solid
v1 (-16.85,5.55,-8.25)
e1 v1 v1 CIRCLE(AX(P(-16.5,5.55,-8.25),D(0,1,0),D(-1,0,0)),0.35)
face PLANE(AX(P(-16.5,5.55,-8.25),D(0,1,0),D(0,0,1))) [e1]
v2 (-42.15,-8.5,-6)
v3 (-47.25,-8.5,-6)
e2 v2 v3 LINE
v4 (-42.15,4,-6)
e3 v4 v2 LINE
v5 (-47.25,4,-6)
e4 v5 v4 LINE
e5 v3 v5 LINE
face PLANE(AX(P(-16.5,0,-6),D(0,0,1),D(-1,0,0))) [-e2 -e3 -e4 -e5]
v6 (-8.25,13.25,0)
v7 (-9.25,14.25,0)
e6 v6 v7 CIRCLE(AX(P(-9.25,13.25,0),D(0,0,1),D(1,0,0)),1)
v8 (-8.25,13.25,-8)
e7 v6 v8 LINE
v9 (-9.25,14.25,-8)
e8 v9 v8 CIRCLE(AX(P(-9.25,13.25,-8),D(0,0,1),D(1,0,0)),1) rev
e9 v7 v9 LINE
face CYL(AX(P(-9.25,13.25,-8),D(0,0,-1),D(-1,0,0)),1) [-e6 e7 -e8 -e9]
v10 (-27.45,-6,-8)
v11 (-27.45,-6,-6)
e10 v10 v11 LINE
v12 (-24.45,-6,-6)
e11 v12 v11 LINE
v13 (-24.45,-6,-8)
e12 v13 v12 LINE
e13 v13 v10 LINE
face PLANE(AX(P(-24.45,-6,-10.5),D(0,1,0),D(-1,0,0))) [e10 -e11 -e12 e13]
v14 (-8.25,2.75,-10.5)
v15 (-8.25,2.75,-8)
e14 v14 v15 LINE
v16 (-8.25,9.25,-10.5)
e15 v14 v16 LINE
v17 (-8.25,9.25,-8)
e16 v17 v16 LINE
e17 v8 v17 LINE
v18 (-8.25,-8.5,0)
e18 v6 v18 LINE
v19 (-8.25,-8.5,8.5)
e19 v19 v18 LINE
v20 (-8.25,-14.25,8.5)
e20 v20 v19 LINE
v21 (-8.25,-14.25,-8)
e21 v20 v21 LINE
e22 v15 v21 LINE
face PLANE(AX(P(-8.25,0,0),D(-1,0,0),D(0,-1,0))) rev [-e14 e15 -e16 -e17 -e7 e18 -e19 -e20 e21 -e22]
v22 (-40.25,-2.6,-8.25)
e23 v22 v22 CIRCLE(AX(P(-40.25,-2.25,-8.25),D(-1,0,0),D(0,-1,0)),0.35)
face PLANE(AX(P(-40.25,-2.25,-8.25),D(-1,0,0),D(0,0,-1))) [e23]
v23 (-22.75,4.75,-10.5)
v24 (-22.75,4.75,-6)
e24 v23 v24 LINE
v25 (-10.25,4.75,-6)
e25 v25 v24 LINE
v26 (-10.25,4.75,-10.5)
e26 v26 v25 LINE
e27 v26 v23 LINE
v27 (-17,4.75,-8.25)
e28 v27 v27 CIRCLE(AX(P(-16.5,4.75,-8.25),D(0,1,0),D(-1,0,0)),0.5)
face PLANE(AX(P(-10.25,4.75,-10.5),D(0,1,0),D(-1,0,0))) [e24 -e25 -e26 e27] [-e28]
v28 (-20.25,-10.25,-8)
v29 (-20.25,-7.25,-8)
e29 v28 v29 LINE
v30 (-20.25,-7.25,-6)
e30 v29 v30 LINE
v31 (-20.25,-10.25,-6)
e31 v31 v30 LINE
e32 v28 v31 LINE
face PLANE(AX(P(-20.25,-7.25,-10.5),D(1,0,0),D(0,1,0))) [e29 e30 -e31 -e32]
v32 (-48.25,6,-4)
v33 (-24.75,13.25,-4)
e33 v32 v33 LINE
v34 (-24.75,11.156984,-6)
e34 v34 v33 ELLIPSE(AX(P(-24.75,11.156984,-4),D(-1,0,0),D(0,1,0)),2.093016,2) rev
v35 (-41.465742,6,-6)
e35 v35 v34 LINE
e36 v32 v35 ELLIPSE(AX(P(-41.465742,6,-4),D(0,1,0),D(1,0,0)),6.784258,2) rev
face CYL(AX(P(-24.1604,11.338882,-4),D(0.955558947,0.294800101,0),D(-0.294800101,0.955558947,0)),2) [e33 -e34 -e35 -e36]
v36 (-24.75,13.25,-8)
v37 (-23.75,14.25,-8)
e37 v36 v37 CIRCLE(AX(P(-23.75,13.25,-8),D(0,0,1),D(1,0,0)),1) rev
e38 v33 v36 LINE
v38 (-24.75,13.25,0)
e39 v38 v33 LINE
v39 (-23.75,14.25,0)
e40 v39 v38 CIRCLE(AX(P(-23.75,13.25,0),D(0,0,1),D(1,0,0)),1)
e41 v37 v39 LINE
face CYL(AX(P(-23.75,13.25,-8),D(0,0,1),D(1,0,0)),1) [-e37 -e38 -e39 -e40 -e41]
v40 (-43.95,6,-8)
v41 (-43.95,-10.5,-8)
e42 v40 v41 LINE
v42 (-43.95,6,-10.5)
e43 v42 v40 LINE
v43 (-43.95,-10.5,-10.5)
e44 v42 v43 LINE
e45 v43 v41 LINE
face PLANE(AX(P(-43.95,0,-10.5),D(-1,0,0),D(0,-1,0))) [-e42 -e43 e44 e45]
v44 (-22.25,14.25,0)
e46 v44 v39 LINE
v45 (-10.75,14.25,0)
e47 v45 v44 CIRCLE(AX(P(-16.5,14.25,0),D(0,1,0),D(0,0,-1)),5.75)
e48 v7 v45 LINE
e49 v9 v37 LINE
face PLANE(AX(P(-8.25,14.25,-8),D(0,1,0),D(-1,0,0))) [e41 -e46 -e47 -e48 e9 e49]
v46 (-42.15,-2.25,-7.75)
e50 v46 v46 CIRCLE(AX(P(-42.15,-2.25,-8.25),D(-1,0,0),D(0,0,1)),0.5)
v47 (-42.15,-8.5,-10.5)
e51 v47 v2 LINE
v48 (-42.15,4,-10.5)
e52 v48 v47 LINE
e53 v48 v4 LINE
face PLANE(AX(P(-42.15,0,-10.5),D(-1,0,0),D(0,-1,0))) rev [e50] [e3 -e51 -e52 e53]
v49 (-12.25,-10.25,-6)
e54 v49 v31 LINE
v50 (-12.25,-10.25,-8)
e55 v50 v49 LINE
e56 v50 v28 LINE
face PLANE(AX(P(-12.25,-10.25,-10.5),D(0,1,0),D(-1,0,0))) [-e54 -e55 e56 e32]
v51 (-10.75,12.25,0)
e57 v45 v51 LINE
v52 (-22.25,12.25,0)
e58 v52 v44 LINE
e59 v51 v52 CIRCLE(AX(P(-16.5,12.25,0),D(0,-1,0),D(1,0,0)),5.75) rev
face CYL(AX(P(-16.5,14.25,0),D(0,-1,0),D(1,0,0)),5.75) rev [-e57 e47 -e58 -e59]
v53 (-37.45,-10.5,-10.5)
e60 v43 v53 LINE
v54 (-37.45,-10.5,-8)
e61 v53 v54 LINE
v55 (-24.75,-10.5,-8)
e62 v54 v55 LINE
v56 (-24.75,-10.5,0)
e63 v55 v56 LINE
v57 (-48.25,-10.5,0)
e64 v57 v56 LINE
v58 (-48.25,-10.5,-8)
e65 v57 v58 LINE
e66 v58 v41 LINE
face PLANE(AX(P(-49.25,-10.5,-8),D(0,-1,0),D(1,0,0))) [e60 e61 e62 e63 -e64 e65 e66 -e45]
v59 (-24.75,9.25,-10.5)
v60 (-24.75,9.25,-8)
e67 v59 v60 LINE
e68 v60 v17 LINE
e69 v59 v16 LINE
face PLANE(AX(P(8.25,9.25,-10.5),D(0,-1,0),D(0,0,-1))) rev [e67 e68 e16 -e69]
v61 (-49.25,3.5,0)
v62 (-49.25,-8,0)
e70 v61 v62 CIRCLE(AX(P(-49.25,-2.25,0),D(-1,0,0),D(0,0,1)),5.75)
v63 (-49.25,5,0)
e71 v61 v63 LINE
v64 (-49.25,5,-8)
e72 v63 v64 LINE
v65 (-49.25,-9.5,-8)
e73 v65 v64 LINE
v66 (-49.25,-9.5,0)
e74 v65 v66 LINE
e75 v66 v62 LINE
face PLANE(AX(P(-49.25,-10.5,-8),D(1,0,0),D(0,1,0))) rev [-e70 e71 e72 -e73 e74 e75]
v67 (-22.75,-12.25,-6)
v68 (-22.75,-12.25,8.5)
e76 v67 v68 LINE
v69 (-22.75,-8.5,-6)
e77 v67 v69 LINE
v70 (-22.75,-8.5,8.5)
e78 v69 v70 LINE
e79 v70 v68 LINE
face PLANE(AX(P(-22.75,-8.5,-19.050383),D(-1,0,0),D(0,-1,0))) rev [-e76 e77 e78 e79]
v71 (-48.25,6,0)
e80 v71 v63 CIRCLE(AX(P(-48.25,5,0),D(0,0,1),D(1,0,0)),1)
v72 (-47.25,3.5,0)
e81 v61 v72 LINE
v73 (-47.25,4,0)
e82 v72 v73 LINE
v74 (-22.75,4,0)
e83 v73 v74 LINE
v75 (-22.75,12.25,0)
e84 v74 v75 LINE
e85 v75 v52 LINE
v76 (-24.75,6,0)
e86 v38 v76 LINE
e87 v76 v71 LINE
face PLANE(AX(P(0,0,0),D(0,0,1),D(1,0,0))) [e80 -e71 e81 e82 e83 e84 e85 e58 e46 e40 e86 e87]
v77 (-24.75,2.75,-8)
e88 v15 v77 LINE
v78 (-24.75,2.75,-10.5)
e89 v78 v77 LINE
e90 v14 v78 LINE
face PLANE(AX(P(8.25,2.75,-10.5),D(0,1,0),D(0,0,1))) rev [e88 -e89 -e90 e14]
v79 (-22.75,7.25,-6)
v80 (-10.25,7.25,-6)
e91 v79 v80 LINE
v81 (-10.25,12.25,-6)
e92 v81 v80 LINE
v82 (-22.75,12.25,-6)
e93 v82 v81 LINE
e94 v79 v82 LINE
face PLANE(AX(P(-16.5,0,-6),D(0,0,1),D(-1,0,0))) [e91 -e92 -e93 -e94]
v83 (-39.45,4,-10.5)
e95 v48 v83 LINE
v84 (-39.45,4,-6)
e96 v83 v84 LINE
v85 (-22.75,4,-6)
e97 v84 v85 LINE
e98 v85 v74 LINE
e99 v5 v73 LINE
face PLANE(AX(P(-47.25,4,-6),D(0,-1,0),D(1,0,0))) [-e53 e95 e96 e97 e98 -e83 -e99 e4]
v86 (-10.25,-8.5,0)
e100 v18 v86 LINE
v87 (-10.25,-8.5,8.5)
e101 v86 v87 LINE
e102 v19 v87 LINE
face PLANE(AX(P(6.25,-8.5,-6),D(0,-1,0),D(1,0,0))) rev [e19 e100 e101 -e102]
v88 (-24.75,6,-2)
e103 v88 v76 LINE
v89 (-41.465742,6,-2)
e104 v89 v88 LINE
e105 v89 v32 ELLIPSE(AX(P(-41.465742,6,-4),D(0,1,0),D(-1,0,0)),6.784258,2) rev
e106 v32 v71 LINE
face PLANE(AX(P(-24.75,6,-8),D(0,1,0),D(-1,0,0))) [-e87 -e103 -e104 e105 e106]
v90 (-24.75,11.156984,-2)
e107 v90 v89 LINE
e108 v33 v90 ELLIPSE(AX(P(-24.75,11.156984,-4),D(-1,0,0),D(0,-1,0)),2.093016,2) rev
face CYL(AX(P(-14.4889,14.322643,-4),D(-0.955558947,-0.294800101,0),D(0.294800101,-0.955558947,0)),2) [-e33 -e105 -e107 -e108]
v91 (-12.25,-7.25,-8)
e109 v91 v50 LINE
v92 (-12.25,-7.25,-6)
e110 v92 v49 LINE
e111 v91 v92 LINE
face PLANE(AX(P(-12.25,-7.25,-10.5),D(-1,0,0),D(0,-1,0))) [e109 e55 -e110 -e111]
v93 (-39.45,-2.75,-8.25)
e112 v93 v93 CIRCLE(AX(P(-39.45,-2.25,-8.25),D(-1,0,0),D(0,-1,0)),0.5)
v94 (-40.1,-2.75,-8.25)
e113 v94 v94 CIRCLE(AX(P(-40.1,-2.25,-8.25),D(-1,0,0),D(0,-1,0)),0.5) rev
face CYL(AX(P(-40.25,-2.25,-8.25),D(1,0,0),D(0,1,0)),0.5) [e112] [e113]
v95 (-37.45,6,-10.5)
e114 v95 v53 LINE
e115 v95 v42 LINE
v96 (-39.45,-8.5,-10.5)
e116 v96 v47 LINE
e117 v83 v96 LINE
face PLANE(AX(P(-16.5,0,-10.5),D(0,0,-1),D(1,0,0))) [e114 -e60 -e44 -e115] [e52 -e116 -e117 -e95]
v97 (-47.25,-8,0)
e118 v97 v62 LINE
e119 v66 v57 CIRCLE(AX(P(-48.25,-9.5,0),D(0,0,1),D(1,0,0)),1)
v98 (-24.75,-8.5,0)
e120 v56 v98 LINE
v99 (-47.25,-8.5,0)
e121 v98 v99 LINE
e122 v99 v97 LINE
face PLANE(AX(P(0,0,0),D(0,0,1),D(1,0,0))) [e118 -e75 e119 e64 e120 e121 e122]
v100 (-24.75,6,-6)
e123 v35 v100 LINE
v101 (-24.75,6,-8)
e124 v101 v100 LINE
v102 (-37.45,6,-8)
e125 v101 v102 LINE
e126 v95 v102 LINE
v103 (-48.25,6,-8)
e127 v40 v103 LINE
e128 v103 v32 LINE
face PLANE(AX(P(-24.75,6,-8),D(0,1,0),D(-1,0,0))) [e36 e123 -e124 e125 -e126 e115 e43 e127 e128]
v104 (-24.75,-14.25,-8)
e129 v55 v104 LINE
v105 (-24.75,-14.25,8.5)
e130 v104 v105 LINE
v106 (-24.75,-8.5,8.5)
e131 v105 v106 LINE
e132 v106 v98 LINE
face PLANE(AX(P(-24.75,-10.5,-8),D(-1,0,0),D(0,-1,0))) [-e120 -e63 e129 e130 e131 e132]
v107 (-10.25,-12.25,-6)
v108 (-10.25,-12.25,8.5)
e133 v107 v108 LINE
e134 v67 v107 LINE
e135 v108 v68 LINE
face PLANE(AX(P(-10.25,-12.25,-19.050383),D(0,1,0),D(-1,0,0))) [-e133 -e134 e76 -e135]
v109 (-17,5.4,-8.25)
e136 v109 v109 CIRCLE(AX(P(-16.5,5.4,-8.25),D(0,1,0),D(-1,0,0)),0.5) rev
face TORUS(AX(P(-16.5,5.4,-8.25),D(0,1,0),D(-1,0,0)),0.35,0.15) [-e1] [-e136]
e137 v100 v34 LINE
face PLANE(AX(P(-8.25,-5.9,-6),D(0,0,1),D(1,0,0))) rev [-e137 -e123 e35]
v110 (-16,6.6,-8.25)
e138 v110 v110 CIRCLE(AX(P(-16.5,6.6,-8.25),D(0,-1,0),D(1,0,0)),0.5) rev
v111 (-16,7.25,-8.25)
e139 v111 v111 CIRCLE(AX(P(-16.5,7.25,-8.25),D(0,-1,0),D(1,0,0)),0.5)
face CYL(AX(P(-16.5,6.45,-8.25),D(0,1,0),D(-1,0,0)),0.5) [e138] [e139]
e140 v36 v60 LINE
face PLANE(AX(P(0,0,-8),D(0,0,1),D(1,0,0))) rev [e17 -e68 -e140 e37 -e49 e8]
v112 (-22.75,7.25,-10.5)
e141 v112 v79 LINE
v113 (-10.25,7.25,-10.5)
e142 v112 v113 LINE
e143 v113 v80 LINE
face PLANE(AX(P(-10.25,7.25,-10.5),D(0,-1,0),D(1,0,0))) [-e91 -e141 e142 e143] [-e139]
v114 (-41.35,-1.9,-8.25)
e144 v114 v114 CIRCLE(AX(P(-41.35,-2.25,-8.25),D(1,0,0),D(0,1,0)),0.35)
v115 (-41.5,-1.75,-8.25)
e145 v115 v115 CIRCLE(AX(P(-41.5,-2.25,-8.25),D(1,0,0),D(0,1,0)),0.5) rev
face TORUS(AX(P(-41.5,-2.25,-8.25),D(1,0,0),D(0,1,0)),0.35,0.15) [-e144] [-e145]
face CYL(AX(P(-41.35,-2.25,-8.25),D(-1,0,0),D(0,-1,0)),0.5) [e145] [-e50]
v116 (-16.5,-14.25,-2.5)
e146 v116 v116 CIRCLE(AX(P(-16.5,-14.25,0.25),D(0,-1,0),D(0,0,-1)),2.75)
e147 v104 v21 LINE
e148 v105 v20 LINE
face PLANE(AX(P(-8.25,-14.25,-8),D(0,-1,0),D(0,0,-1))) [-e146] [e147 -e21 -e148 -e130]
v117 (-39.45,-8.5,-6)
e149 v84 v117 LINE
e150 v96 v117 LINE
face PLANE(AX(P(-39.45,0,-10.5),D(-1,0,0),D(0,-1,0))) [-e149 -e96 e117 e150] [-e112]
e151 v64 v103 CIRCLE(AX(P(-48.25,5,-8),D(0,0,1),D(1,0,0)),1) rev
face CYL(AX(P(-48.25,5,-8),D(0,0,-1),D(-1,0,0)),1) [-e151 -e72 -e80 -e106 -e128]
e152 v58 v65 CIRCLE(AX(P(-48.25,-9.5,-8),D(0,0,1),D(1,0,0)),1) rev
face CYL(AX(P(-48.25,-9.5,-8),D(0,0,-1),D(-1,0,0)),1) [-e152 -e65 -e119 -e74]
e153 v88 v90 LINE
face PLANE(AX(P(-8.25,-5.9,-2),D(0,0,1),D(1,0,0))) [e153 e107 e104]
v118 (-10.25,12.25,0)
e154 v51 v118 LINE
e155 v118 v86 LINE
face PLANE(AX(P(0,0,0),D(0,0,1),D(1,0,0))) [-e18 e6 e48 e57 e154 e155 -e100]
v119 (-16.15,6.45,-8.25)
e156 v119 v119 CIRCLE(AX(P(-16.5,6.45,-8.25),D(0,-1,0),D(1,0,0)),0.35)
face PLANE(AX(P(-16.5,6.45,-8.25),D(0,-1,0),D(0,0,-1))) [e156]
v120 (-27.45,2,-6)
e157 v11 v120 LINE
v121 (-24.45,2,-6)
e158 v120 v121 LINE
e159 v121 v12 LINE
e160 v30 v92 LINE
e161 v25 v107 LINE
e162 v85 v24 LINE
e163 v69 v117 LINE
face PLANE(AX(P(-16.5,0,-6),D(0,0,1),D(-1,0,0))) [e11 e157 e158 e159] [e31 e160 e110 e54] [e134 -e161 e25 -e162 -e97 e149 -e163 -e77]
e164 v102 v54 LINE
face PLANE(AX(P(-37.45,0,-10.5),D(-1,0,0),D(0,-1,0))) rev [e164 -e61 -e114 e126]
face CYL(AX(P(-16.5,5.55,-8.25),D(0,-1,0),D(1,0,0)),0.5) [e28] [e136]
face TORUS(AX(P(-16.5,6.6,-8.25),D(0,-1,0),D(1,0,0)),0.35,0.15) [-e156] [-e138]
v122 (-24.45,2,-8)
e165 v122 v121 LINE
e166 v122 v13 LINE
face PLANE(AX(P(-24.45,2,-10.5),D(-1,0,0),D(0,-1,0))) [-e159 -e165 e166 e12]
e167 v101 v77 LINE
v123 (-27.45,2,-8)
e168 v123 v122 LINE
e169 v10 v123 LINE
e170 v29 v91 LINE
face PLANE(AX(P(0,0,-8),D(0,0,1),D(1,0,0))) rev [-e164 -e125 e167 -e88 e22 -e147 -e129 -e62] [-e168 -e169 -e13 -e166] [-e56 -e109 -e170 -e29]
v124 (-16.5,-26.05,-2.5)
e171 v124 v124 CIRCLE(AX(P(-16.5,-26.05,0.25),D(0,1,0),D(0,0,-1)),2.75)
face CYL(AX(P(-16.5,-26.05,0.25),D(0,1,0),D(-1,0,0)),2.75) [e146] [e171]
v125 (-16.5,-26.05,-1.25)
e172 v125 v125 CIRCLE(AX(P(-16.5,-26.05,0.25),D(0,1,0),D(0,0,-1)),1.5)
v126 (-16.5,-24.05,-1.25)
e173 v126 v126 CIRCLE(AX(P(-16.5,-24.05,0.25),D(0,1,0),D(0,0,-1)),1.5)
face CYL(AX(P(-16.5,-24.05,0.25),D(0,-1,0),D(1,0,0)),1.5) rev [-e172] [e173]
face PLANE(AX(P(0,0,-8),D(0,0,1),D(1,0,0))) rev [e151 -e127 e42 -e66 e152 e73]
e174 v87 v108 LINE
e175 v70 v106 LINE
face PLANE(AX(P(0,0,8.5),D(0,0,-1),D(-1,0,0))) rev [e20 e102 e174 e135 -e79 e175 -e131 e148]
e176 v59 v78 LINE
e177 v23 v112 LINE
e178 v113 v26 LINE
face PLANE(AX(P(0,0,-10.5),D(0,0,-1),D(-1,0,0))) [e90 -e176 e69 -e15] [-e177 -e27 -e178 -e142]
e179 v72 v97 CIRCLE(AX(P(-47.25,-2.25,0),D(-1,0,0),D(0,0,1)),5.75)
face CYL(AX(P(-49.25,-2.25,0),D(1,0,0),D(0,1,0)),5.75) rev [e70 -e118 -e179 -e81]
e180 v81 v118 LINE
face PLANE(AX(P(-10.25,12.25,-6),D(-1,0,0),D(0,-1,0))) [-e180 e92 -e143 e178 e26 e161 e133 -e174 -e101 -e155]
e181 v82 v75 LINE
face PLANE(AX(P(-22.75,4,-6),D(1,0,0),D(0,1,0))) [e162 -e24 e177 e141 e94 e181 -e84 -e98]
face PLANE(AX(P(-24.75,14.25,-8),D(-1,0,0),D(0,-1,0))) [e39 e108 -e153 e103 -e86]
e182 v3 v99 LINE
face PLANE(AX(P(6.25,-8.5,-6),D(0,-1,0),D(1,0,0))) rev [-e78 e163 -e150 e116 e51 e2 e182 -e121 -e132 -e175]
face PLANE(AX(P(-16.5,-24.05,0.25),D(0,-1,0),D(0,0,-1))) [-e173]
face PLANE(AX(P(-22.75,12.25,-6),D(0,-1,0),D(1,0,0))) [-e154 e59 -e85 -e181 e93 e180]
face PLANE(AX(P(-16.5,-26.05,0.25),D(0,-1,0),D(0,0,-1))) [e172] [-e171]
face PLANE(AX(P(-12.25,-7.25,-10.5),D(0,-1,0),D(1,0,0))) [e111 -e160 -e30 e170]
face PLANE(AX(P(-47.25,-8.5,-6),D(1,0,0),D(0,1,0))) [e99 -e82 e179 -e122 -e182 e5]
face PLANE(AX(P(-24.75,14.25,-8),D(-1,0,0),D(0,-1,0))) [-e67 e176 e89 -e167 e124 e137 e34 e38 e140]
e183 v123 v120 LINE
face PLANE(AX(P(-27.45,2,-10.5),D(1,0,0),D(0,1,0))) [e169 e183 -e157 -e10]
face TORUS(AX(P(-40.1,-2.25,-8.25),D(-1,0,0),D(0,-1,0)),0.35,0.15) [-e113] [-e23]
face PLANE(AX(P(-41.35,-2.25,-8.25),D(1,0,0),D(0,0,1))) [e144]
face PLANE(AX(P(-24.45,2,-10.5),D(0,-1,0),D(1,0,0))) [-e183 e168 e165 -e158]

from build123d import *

# Parameters (mm, degrees)
EXTRUDE_1_DEPTH             = 8
CUT_EXTRUDE_2_DEPTH         = 6
SKETCH_3_R                  = 5.75
CUT_EXTRUDE_3_DEPTH         = 43.881377077
SKETCH_4_R                  = 5.75
CUT_EXTRUDE_4_DEPTH         = 43.285488054
SKETCH_10_W                 = 16.5
SKETCH_10_H                 = 6.5
EXTRUDE_3_DEPTH             = 2.5
EXTRUDE_4_OUTLINE_W         = 6.5
EXTRUDE_4_OUTLINE_H         = 16.5
EXTRUDE_4_DEPTH             = 2.5
SKETCH_12_W                 = 12.5
SKETCH_12_H                 = 2.5
CUT_EXTRUDE_8_DEPTH         = 37.216363705
CUT_EXTRUDE_START           = -4.5
CUT_EXTRUDE_9_OUTLINE_W     = 2.7
CUT_EXTRUDE_9_OUTLINE_H     = 12.5
CUT_EXTRUDE_9_DEPTH         = 4.5
EXTRUDE_5_REACH             = 39.227
SKETCH_15_W                 = 16.5
SKETCH_15_H                 = 5.75
EXTRUDE_5_DIRECTION_2_DEPTH = 8.5
SKETCH_16_W                 = 12.5
SKETCH_16_H                 = 3.75
CUT_EXTRUDE_11_DEPTH        = 14.5
SKETCH_17_R                 = 2.75
EXTRUDE_6_DEPTH             = 11.8
SKETCH_19_R                 = 1.5
CUT_EXTRUDE_12_DEPTH        = 2
SKETCH_20_W                 = 8
SKETCH_20_H                 = 3
CUT_EXTRUDE_13_DEPTH        = 45.287865155
SKETCH_22_W                 = 3
SKETCH_22_H                 = 8
CUT_EXTRUDE_14_DEPTH        = 45.287865155
FILLET_5_R                  = 1
FILLET_6_R                  = 1
RIB_3_REACH                 = 45.674
SKETCH_26_WALL_W            = 113.940860968
SKETCH_26_WALL_H            = 4
FILLET_12_R                 = 2
SKETCH_28_R                 = 0.5
EXTRUDE_7_DEPTH             = 0.8
FILLET_13_R                 = 0.15
EXTRUDE_START               = 0.8
SKETCH_31_R                 = 0.5
EXTRUDE_9_DEPTH             = 0.8
FILLET_14_R                 = 0.15
SKETCH_34_R                 = 0.5
EXTRUDE_10_DEPTH            = 0.8
FILLET_16_R                 = 0.15
SKETCH_35_R                 = 0.5
EXTRUDE_11_DEPTH            = 0.8
FILLET_17_R                 = 0.15
FILLET_5_OF_MIRROR_12_R     = 1
FILLET_6_OF_MIRROR_12_R     = 1
FILLET_12_OF_MIRROR_12_R    = 2
FILLET_13_OF_MIRROR_12_R    = 0.15
FILLET_14_OF_MIRROR_12_R    = 0.15
FILLET_16_OF_MIRROR_12_R    = 0.15
FILLET_17_OF_MIRROR_12_R    = 0.15
SKETCH_32_W                 = 34.689235526
SKETCH_32_H                 = 51.308413002
CUT_EXTRUDE_15_DEPTH        = 50.697610607


# Read off the part's stored shape, not the designer's step: 凸台-拉伸4, 切除-拉伸9
with BuildPart() as part:
    # 草图1 → 凸台-拉伸1 (new body)
    with BuildSketch(Plane.XY):
        Polygon((-8.25, 14.25), (8.25, 14.25), (8.25, 6), (32.75, 6), (32.75, -10.5), (8.25, -10.5), (8.25, -14.25), (-8.25, -14.25), align=None)
    extrude_1 = extrude(amount=-EXTRUDE_1_DEPTH)

    # 草图2 → 切除-拉伸2 (cut)
    with BuildSketch(Plane.XY):
        Polygon((-6.25, 12.25), (-6.25, -12.25), (6.25, -12.25), (6.25, -8.5), (30.75, -8.5), (30.75, 4), (6.25, 4), (6.25, 12.25), align=None)
    cut_extrude_2 = extrude(amount=-CUT_EXTRUDE_2_DEPTH, mode=Mode.SUBTRACT)

    # 草图3 → 切除-拉伸3 (cut, through all)
    with BuildSketch(Plane.XZ.offset(-12.25)):
        Circle(SKETCH_3_R)
    cut_extrude_3 = extrude(amount=-CUT_EXTRUDE_3_DEPTH, mode=Mode.SUBTRACT)

    # 草图4 → 切除-拉伸4 (cut, through all)
    with BuildSketch(Plane.ZY.offset(-30.75)):
        with Locations((0, -2.25)):
            Circle(SKETCH_4_R)
    cut_extrude_4 = extrude(amount=-CUT_EXTRUDE_4_DEPTH, mode=Mode.SUBTRACT)

    # 草图10 → 凸台-拉伸3 (add)
    with BuildSketch(Plane(origin=(0, 0, -8), x_dir=(-1, 0, 0), z_dir=(0, 0, -1))):
        with Locations((0, 6)):
            Rectangle(SKETCH_10_W, SKETCH_10_H)
    extrude_3 = extrude(amount=EXTRUDE_3_DEPTH)

    # 凸台-拉伸4 outline → 凸台-拉伸4 (add)
    with BuildSketch(Plane(origin=(0, 0, -8), x_dir=(-1, 0, 0), z_dir=(0, 0, -1))):
        with Locations((-24.2, -2.25)):
            Rectangle(EXTRUDE_4_OUTLINE_W, EXTRUDE_4_OUTLINE_H)
    extrude_4 = extrude(amount=EXTRUDE_4_DEPTH)

    # 草图12 → 切除-拉伸8 (cut, through all)
    with BuildSketch(Plane.XY.offset(-6)):
        with Locations((0, 6)):
            Rectangle(SKETCH_12_W, SKETCH_12_H)
    cut_extrude_8 = extrude(amount=-CUT_EXTRUDE_8_DEPTH, mode=Mode.SUBTRACT)

    # 切除-拉伸9 outline → 切除-拉伸9 (cut)
    with BuildSketch(Plane.XY.offset(-6).offset(CUT_EXTRUDE_START)):
        with Locations((24.3, -2.25)):
            Rectangle(CUT_EXTRUDE_9_OUTLINE_W, CUT_EXTRUDE_9_OUTLINE_H)
    cut_extrude_9 = extrude(amount=CUT_EXTRUDE_9_DEPTH, mode=Mode.SUBTRACT)

    # 草图15 → 凸台-拉伸5 (add, up to next)
    with BuildSketch(Plane.XY, mode=Mode.PRIVATE) as extrude_5_sk1:
        with Locations((0, -11.375)):
            Rectangle(SKETCH_15_W, SKETCH_15_H)
    extrude_5_tool1 = extrude(extrude_5_sk1.sketch, amount=-EXTRUDE_5_REACH, mode=Mode.PRIVATE) - part.part
    extrude_5 = extrude_5_tool1.solids().sort_by_distance((0, -11.375, 0))[0]
    add(extrude_5)

    # 草图15 → 凸台-拉伸5 direction 2 (add)
    with BuildSketch(Plane.XY):
        with Locations((0, -11.375)):
            Rectangle(SKETCH_15_W, SKETCH_15_H)
    extrude_5_direction_2 = extrude(amount=EXTRUDE_5_DIRECTION_2_DEPTH)

    # 草图16 → 切除-拉伸11 (cut)
    with BuildSketch(Plane.XY.offset(8.5)):
        with Locations((0, -10.375)):
            Rectangle(SKETCH_16_W, SKETCH_16_H)
    cut_extrude_11 = extrude(amount=-CUT_EXTRUDE_11_DEPTH, mode=Mode.SUBTRACT)

    # 草图17 → 凸台-拉伸6 (add)
    with BuildSketch(Plane.XZ.offset(14.25)):
        with Locations(Location((0, 0.25, 0), (0, 0, 270))):
            Circle(SKETCH_17_R)
    extrude_6 = extrude(amount=EXTRUDE_6_DEPTH)

    # 草图19 → 切除-拉伸12 (cut)
    with BuildSketch(Plane.XZ.offset(26.05)):
        with Locations(Location((0, 0.25, 0), (0, 0, 270))):
            Circle(SKETCH_19_R)
    cut_extrude_12 = extrude(amount=-CUT_EXTRUDE_12_DEPTH, mode=Mode.SUBTRACT)

    # 草图20 → 切除-拉伸13 (cut, through all)
    with BuildSketch(Plane.XY.offset(-6)):
        with Locations((-0.25, -8.75)):
            Rectangle(SKETCH_20_W, SKETCH_20_H)
    cut_extrude_13 = extrude(amount=-CUT_EXTRUDE_13_DEPTH, mode=Mode.SUBTRACT)

    # 草图22 → 切除-拉伸14 (cut, through all)
    with BuildSketch(Plane.XY.offset(-6)):
        with Locations((9.45, -2)):
            Rectangle(SKETCH_22_W, SKETCH_22_H)
    cut_extrude_14 = extrude(amount=-CUT_EXTRUDE_14_DEPTH, mode=Mode.SUBTRACT)

    # 圆角5
    fillet_5_edges = [part.edges().sort_by_distance(p)[0] for p in [
        (-8.25, 14.25, -4),
        (8.25, 14.25, -4),
    ]]
    fillet(fillet_5_edges, radius=FILLET_5_R)

    # 圆角6
    fillet_6_edges = [part.edges().sort_by_distance(p)[0] for p in [
        (32.75, 6, -4),
        (32.75, -10.5, -4),
    ]]
    fillet(fillet_6_edges, radius=FILLET_6_R)

    # 草图26 wall → 筋3 (add, up to next)
    with BuildSketch(Plane(origin=(20, 9.625, -4), x_dir=(0.955558946739, -0.29480010059, 0), z_dir=(0.29480010059, 0.955558946739, 0)), mode=Mode.PRIVATE) as rib_3_sk1:
        Rectangle(SKETCH_26_WALL_W, SKETCH_26_WALL_H)
    rib_3_tool1 = extrude(rib_3_sk1.sketch, amount=-RIB_3_REACH, mode=Mode.PRIVATE) - part.part
    rib_3 = rib_3_tool1.solids().sort_by_distance((20, 9.625, -4))[0]
    add(rib_3)

    # 圆角12
    fillet_12_edges = [part.edges().sort_by_distance(p)[0] for p in [
        (20, 9.625, -2),
        (20, 9.625, -6),
    ]]
    fillet(fillet_12_edges, radius=FILLET_12_R - 0.0001)  # a hair under: the kernel refuses the full size

    # 草图28 → 凸台-拉伸7 (add)
    with BuildSketch(Plane.XZ.offset(-7.25)):
        with Locations(Location((0, -8.25, 0), (0, 0, 90))):
            Circle(SKETCH_28_R)
    extrude_7 = extrude(amount=EXTRUDE_7_DEPTH)

    # 圆角13
    fillet_13_edges = [part.edges().sort_by_distance(p)[0] for p in [
        (0, 6.45, -8.75),
    ]]
    fillet(fillet_13_edges, radius=FILLET_13_R)

    # 草图31 → 凸台-拉伸9 (add)
    with BuildSketch(Plane(origin=(0, 4.75, 0), x_dir=(1, 0, 0), z_dir=(0, 1, 0)).offset(EXTRUDE_START)):
        with Locations(Location((0, 8.25, 0), (0, 0, 270))):
            Circle(SKETCH_31_R)
    extrude_9 = extrude(amount=-EXTRUDE_9_DEPTH)

    # 圆角14
    fillet_14_edges = [part.edges().sort_by_distance(p)[0] for p in [
        (0, 5.55, -8.75),
    ]]
    fillet(fillet_14_edges, radius=FILLET_14_R)

    # 草图34 → 凸台-拉伸10 (add)
    with BuildSketch(Plane.ZY.offset(-25.65)):
        with Locations((-8.25, -2.25)):
            Circle(SKETCH_34_R)
    extrude_10 = extrude(amount=EXTRUDE_10_DEPTH)

    # 圆角16
    fillet_16_edges = [part.edges().sort_by_distance(p)[0] for p in [
        (24.85, -2.25, -8.75),
    ]]
    fillet(fillet_16_edges, radius=FILLET_16_R)

    # 草图35 → 凸台-拉伸11 (add)
    with BuildSketch(Plane(origin=(22.95, 0, 0), x_dir=(0, 0, -1), z_dir=(1, 0, 0)).offset(EXTRUDE_START)):
        with Locations(Location((8.25, -2.25, 0), (0, 0, 180))):
            Circle(SKETCH_35_R)
    extrude_11 = extrude(amount=-EXTRUDE_11_DEPTH)

    # 圆角17
    fillet_17_edges = [part.edges().sort_by_distance(p)[0] for p in [
        (23.75, -2.25, -8.75),
    ]]
    fillet(fillet_17_edges, radius=FILLET_17_R)


with BuildPart() as mirror_12_1:
    # 镜向12: 凸台-拉伸1 across plane
    add(extrude_1.mirror(Plane.ZY.offset(8.25)))

    # Mirror 12 2: 切除-拉伸2, 切除-拉伸3, 切除-拉伸4 across plane
    add(cut_extrude_2.mirror(Plane.ZY.offset(8.25)), mode=Mode.SUBTRACT)
    add(cut_extrude_3.mirror(Plane.ZY.offset(8.25)), mode=Mode.SUBTRACT)
    add(cut_extrude_4.mirror(Plane.ZY.offset(8.25)), mode=Mode.SUBTRACT)


with BuildPart() as mirror_12_3_1:
    # Mirror 12 3: 凸台-拉伸3, 凸台-拉伸4 across plane
    add(extrude_3.mirror(Plane.ZY.offset(8.25)))
    add(extrude_4.mirror(Plane.ZY.offset(8.25)))


with BuildPart() as mirror_12_4_tool:
    # Mirror 12 4: 切除-拉伸8, 切除-拉伸9 across plane
    add(cut_extrude_8.mirror(Plane.ZY.offset(8.25)))
    add(cut_extrude_9.mirror(Plane.ZY.offset(8.25)))


with BuildPart() as mirror_12_1_1:
    add(mirror_12_1.part)

    # Mirror 12 4: cut by mirror_12_4_tool
    add(mirror_12_4_tool.part, mode=Mode.SUBTRACT)


with BuildPart() as mirror_12_3_1_1:
    add(mirror_12_3_1.part)

    # Mirror 12 4: cut by mirror_12_4_tool
    add(mirror_12_4_tool.part, mode=Mode.SUBTRACT)


with BuildPart() as mirror_12_5_1:
    # Mirror 12 5: 凸台-拉伸5, 凸台-拉伸5 direction 2 across plane
    add(extrude_5.mirror(Plane.ZY.offset(8.25)))
    add(extrude_5_direction_2.mirror(Plane.ZY.offset(8.25)))

    # Mirror 12 6: 切除-拉伸11 across plane
    add(cut_extrude_11.mirror(Plane.ZY.offset(8.25)), mode=Mode.SUBTRACT)


with BuildPart() as mirror_12_7_1:
    # Mirror 12 7: 凸台-拉伸6 across plane
    add(extrude_6.mirror(Plane.ZY.offset(8.25)))


with BuildPart() as mirror_12_8_tool:
    # Mirror 12 8: 切除-拉伸12, 切除-拉伸13, 切除-拉伸14 across plane
    add(cut_extrude_12.mirror(Plane.ZY.offset(8.25)))
    add(cut_extrude_13.mirror(Plane.ZY.offset(8.25)))
    add(cut_extrude_14.mirror(Plane.ZY.offset(8.25)))


with BuildPart() as mirror_12_1_2:
    add(mirror_12_1_1.part)

    # Mirror 12 8: cut by mirror_12_8_tool
    add(mirror_12_8_tool.part, mode=Mode.SUBTRACT)

    # 圆角5 of 镜向12
    fillet_5_of_mirror_12_edges = [mirror_12_1_2.edges().sort_by_distance(p)[0] for p in [
        (-8.25, 14.25, -4),
        (-24.75, 14.25, -4),
    ]]
    fillet(fillet_5_of_mirror_12_edges, radius=FILLET_5_OF_MIRROR_12_R)

    # 圆角6 of 镜向12
    fillet_6_of_mirror_12_edges = [mirror_12_1_2.edges().sort_by_distance(p)[0] for p in [
        (-49.25, 6, -4),
        (-49.25, -10.5, -4),
    ]]
    fillet(fillet_6_of_mirror_12_edges, radius=FILLET_6_OF_MIRROR_12_R)


with BuildPart() as mirror_12_7_1_1:
    add(mirror_12_7_1.part)

    # Mirror 12 8: cut by mirror_12_8_tool
    add(mirror_12_8_tool.part, mode=Mode.SUBTRACT)


with BuildPart() as mirror_12_9_1:
    # Mirror 12 9: 筋3, 凸台-拉伸7, 凸台-拉伸9, 凸台-拉伸10, 凸台-拉伸11 across plane
    add(rib_3.mirror(Plane.ZY.offset(8.25)))
    add(extrude_7.mirror(Plane.ZY.offset(8.25)))
    add(extrude_9.mirror(Plane.ZY.offset(8.25)))
    add(extrude_10.mirror(Plane.ZY.offset(8.25)))
    add(extrude_11.mirror(Plane.ZY.offset(8.25)))

    # 圆角12 of 镜向12
    fillet_12_of_mirror_12_edges = [mirror_12_9_1.edges().sort_by_distance(p)[0] for p in [
        (-36.5, 9.625, -2),
        (-36.5, 9.625, -6),
    ]]
    fillet(fillet_12_of_mirror_12_edges, radius=FILLET_12_OF_MIRROR_12_R - 0.0001)  # a hair under: the kernel refuses the full size

    # 圆角13 of 镜向12
    fillet_13_of_mirror_12_edges = [mirror_12_9_1.edges().sort_by_distance(p)[0] for p in [
        (-16.5, 6.45, -8.75),
    ]]
    fillet(fillet_13_of_mirror_12_edges, radius=FILLET_13_OF_MIRROR_12_R)

    # 圆角14 of 镜向12
    fillet_14_of_mirror_12_edges = [mirror_12_9_1.edges().sort_by_distance(p)[0] for p in [
        (-16.5, 5.55, -8.75),
    ]]
    fillet(fillet_14_of_mirror_12_edges, radius=FILLET_14_OF_MIRROR_12_R)

    # 圆角16 of 镜向12
    fillet_16_of_mirror_12_edges = [mirror_12_9_1.edges().sort_by_distance(p)[0] for p in [
        (-41.35, -2.25, -8.75),
    ]]
    fillet(fillet_16_of_mirror_12_edges, radius=FILLET_16_OF_MIRROR_12_R)

    # 圆角17 of 镜向12
    fillet_17_of_mirror_12_edges = [mirror_12_9_1.edges().sort_by_distance(p)[0] for p in [
        (-40.25, -2.25, -8.75),
    ]]
    fillet(fillet_17_of_mirror_12_edges, radius=FILLET_17_OF_MIRROR_12_R)


with BuildPart() as part_1:
    add(part.part)

    # 镜向12 united with what the copies to: union 镜向12_1, 镜向12 3_1, 镜向12 5_1, 镜向12 7_1, 镜向12 9_1
    add(mirror_12_1_2.part)
    add(mirror_12_3_1_1.part)
    add(mirror_12_5_1.part)
    add(mirror_12_7_1_1.part)
    add(mirror_12_9_1.part)

    # 草图32 → 切除-拉伸15 (cut, through all)
    with BuildSketch(Plane.ZY.offset(8.25)):
        with Locations((-0.725440287, -5.737573176)):
            Rectangle(SKETCH_32_W, SKETCH_32_H)
    extrude(amount=-CUT_EXTRUDE_15_DEPTH, mode=Mode.SUBTRACT)


solid = part_1.part
